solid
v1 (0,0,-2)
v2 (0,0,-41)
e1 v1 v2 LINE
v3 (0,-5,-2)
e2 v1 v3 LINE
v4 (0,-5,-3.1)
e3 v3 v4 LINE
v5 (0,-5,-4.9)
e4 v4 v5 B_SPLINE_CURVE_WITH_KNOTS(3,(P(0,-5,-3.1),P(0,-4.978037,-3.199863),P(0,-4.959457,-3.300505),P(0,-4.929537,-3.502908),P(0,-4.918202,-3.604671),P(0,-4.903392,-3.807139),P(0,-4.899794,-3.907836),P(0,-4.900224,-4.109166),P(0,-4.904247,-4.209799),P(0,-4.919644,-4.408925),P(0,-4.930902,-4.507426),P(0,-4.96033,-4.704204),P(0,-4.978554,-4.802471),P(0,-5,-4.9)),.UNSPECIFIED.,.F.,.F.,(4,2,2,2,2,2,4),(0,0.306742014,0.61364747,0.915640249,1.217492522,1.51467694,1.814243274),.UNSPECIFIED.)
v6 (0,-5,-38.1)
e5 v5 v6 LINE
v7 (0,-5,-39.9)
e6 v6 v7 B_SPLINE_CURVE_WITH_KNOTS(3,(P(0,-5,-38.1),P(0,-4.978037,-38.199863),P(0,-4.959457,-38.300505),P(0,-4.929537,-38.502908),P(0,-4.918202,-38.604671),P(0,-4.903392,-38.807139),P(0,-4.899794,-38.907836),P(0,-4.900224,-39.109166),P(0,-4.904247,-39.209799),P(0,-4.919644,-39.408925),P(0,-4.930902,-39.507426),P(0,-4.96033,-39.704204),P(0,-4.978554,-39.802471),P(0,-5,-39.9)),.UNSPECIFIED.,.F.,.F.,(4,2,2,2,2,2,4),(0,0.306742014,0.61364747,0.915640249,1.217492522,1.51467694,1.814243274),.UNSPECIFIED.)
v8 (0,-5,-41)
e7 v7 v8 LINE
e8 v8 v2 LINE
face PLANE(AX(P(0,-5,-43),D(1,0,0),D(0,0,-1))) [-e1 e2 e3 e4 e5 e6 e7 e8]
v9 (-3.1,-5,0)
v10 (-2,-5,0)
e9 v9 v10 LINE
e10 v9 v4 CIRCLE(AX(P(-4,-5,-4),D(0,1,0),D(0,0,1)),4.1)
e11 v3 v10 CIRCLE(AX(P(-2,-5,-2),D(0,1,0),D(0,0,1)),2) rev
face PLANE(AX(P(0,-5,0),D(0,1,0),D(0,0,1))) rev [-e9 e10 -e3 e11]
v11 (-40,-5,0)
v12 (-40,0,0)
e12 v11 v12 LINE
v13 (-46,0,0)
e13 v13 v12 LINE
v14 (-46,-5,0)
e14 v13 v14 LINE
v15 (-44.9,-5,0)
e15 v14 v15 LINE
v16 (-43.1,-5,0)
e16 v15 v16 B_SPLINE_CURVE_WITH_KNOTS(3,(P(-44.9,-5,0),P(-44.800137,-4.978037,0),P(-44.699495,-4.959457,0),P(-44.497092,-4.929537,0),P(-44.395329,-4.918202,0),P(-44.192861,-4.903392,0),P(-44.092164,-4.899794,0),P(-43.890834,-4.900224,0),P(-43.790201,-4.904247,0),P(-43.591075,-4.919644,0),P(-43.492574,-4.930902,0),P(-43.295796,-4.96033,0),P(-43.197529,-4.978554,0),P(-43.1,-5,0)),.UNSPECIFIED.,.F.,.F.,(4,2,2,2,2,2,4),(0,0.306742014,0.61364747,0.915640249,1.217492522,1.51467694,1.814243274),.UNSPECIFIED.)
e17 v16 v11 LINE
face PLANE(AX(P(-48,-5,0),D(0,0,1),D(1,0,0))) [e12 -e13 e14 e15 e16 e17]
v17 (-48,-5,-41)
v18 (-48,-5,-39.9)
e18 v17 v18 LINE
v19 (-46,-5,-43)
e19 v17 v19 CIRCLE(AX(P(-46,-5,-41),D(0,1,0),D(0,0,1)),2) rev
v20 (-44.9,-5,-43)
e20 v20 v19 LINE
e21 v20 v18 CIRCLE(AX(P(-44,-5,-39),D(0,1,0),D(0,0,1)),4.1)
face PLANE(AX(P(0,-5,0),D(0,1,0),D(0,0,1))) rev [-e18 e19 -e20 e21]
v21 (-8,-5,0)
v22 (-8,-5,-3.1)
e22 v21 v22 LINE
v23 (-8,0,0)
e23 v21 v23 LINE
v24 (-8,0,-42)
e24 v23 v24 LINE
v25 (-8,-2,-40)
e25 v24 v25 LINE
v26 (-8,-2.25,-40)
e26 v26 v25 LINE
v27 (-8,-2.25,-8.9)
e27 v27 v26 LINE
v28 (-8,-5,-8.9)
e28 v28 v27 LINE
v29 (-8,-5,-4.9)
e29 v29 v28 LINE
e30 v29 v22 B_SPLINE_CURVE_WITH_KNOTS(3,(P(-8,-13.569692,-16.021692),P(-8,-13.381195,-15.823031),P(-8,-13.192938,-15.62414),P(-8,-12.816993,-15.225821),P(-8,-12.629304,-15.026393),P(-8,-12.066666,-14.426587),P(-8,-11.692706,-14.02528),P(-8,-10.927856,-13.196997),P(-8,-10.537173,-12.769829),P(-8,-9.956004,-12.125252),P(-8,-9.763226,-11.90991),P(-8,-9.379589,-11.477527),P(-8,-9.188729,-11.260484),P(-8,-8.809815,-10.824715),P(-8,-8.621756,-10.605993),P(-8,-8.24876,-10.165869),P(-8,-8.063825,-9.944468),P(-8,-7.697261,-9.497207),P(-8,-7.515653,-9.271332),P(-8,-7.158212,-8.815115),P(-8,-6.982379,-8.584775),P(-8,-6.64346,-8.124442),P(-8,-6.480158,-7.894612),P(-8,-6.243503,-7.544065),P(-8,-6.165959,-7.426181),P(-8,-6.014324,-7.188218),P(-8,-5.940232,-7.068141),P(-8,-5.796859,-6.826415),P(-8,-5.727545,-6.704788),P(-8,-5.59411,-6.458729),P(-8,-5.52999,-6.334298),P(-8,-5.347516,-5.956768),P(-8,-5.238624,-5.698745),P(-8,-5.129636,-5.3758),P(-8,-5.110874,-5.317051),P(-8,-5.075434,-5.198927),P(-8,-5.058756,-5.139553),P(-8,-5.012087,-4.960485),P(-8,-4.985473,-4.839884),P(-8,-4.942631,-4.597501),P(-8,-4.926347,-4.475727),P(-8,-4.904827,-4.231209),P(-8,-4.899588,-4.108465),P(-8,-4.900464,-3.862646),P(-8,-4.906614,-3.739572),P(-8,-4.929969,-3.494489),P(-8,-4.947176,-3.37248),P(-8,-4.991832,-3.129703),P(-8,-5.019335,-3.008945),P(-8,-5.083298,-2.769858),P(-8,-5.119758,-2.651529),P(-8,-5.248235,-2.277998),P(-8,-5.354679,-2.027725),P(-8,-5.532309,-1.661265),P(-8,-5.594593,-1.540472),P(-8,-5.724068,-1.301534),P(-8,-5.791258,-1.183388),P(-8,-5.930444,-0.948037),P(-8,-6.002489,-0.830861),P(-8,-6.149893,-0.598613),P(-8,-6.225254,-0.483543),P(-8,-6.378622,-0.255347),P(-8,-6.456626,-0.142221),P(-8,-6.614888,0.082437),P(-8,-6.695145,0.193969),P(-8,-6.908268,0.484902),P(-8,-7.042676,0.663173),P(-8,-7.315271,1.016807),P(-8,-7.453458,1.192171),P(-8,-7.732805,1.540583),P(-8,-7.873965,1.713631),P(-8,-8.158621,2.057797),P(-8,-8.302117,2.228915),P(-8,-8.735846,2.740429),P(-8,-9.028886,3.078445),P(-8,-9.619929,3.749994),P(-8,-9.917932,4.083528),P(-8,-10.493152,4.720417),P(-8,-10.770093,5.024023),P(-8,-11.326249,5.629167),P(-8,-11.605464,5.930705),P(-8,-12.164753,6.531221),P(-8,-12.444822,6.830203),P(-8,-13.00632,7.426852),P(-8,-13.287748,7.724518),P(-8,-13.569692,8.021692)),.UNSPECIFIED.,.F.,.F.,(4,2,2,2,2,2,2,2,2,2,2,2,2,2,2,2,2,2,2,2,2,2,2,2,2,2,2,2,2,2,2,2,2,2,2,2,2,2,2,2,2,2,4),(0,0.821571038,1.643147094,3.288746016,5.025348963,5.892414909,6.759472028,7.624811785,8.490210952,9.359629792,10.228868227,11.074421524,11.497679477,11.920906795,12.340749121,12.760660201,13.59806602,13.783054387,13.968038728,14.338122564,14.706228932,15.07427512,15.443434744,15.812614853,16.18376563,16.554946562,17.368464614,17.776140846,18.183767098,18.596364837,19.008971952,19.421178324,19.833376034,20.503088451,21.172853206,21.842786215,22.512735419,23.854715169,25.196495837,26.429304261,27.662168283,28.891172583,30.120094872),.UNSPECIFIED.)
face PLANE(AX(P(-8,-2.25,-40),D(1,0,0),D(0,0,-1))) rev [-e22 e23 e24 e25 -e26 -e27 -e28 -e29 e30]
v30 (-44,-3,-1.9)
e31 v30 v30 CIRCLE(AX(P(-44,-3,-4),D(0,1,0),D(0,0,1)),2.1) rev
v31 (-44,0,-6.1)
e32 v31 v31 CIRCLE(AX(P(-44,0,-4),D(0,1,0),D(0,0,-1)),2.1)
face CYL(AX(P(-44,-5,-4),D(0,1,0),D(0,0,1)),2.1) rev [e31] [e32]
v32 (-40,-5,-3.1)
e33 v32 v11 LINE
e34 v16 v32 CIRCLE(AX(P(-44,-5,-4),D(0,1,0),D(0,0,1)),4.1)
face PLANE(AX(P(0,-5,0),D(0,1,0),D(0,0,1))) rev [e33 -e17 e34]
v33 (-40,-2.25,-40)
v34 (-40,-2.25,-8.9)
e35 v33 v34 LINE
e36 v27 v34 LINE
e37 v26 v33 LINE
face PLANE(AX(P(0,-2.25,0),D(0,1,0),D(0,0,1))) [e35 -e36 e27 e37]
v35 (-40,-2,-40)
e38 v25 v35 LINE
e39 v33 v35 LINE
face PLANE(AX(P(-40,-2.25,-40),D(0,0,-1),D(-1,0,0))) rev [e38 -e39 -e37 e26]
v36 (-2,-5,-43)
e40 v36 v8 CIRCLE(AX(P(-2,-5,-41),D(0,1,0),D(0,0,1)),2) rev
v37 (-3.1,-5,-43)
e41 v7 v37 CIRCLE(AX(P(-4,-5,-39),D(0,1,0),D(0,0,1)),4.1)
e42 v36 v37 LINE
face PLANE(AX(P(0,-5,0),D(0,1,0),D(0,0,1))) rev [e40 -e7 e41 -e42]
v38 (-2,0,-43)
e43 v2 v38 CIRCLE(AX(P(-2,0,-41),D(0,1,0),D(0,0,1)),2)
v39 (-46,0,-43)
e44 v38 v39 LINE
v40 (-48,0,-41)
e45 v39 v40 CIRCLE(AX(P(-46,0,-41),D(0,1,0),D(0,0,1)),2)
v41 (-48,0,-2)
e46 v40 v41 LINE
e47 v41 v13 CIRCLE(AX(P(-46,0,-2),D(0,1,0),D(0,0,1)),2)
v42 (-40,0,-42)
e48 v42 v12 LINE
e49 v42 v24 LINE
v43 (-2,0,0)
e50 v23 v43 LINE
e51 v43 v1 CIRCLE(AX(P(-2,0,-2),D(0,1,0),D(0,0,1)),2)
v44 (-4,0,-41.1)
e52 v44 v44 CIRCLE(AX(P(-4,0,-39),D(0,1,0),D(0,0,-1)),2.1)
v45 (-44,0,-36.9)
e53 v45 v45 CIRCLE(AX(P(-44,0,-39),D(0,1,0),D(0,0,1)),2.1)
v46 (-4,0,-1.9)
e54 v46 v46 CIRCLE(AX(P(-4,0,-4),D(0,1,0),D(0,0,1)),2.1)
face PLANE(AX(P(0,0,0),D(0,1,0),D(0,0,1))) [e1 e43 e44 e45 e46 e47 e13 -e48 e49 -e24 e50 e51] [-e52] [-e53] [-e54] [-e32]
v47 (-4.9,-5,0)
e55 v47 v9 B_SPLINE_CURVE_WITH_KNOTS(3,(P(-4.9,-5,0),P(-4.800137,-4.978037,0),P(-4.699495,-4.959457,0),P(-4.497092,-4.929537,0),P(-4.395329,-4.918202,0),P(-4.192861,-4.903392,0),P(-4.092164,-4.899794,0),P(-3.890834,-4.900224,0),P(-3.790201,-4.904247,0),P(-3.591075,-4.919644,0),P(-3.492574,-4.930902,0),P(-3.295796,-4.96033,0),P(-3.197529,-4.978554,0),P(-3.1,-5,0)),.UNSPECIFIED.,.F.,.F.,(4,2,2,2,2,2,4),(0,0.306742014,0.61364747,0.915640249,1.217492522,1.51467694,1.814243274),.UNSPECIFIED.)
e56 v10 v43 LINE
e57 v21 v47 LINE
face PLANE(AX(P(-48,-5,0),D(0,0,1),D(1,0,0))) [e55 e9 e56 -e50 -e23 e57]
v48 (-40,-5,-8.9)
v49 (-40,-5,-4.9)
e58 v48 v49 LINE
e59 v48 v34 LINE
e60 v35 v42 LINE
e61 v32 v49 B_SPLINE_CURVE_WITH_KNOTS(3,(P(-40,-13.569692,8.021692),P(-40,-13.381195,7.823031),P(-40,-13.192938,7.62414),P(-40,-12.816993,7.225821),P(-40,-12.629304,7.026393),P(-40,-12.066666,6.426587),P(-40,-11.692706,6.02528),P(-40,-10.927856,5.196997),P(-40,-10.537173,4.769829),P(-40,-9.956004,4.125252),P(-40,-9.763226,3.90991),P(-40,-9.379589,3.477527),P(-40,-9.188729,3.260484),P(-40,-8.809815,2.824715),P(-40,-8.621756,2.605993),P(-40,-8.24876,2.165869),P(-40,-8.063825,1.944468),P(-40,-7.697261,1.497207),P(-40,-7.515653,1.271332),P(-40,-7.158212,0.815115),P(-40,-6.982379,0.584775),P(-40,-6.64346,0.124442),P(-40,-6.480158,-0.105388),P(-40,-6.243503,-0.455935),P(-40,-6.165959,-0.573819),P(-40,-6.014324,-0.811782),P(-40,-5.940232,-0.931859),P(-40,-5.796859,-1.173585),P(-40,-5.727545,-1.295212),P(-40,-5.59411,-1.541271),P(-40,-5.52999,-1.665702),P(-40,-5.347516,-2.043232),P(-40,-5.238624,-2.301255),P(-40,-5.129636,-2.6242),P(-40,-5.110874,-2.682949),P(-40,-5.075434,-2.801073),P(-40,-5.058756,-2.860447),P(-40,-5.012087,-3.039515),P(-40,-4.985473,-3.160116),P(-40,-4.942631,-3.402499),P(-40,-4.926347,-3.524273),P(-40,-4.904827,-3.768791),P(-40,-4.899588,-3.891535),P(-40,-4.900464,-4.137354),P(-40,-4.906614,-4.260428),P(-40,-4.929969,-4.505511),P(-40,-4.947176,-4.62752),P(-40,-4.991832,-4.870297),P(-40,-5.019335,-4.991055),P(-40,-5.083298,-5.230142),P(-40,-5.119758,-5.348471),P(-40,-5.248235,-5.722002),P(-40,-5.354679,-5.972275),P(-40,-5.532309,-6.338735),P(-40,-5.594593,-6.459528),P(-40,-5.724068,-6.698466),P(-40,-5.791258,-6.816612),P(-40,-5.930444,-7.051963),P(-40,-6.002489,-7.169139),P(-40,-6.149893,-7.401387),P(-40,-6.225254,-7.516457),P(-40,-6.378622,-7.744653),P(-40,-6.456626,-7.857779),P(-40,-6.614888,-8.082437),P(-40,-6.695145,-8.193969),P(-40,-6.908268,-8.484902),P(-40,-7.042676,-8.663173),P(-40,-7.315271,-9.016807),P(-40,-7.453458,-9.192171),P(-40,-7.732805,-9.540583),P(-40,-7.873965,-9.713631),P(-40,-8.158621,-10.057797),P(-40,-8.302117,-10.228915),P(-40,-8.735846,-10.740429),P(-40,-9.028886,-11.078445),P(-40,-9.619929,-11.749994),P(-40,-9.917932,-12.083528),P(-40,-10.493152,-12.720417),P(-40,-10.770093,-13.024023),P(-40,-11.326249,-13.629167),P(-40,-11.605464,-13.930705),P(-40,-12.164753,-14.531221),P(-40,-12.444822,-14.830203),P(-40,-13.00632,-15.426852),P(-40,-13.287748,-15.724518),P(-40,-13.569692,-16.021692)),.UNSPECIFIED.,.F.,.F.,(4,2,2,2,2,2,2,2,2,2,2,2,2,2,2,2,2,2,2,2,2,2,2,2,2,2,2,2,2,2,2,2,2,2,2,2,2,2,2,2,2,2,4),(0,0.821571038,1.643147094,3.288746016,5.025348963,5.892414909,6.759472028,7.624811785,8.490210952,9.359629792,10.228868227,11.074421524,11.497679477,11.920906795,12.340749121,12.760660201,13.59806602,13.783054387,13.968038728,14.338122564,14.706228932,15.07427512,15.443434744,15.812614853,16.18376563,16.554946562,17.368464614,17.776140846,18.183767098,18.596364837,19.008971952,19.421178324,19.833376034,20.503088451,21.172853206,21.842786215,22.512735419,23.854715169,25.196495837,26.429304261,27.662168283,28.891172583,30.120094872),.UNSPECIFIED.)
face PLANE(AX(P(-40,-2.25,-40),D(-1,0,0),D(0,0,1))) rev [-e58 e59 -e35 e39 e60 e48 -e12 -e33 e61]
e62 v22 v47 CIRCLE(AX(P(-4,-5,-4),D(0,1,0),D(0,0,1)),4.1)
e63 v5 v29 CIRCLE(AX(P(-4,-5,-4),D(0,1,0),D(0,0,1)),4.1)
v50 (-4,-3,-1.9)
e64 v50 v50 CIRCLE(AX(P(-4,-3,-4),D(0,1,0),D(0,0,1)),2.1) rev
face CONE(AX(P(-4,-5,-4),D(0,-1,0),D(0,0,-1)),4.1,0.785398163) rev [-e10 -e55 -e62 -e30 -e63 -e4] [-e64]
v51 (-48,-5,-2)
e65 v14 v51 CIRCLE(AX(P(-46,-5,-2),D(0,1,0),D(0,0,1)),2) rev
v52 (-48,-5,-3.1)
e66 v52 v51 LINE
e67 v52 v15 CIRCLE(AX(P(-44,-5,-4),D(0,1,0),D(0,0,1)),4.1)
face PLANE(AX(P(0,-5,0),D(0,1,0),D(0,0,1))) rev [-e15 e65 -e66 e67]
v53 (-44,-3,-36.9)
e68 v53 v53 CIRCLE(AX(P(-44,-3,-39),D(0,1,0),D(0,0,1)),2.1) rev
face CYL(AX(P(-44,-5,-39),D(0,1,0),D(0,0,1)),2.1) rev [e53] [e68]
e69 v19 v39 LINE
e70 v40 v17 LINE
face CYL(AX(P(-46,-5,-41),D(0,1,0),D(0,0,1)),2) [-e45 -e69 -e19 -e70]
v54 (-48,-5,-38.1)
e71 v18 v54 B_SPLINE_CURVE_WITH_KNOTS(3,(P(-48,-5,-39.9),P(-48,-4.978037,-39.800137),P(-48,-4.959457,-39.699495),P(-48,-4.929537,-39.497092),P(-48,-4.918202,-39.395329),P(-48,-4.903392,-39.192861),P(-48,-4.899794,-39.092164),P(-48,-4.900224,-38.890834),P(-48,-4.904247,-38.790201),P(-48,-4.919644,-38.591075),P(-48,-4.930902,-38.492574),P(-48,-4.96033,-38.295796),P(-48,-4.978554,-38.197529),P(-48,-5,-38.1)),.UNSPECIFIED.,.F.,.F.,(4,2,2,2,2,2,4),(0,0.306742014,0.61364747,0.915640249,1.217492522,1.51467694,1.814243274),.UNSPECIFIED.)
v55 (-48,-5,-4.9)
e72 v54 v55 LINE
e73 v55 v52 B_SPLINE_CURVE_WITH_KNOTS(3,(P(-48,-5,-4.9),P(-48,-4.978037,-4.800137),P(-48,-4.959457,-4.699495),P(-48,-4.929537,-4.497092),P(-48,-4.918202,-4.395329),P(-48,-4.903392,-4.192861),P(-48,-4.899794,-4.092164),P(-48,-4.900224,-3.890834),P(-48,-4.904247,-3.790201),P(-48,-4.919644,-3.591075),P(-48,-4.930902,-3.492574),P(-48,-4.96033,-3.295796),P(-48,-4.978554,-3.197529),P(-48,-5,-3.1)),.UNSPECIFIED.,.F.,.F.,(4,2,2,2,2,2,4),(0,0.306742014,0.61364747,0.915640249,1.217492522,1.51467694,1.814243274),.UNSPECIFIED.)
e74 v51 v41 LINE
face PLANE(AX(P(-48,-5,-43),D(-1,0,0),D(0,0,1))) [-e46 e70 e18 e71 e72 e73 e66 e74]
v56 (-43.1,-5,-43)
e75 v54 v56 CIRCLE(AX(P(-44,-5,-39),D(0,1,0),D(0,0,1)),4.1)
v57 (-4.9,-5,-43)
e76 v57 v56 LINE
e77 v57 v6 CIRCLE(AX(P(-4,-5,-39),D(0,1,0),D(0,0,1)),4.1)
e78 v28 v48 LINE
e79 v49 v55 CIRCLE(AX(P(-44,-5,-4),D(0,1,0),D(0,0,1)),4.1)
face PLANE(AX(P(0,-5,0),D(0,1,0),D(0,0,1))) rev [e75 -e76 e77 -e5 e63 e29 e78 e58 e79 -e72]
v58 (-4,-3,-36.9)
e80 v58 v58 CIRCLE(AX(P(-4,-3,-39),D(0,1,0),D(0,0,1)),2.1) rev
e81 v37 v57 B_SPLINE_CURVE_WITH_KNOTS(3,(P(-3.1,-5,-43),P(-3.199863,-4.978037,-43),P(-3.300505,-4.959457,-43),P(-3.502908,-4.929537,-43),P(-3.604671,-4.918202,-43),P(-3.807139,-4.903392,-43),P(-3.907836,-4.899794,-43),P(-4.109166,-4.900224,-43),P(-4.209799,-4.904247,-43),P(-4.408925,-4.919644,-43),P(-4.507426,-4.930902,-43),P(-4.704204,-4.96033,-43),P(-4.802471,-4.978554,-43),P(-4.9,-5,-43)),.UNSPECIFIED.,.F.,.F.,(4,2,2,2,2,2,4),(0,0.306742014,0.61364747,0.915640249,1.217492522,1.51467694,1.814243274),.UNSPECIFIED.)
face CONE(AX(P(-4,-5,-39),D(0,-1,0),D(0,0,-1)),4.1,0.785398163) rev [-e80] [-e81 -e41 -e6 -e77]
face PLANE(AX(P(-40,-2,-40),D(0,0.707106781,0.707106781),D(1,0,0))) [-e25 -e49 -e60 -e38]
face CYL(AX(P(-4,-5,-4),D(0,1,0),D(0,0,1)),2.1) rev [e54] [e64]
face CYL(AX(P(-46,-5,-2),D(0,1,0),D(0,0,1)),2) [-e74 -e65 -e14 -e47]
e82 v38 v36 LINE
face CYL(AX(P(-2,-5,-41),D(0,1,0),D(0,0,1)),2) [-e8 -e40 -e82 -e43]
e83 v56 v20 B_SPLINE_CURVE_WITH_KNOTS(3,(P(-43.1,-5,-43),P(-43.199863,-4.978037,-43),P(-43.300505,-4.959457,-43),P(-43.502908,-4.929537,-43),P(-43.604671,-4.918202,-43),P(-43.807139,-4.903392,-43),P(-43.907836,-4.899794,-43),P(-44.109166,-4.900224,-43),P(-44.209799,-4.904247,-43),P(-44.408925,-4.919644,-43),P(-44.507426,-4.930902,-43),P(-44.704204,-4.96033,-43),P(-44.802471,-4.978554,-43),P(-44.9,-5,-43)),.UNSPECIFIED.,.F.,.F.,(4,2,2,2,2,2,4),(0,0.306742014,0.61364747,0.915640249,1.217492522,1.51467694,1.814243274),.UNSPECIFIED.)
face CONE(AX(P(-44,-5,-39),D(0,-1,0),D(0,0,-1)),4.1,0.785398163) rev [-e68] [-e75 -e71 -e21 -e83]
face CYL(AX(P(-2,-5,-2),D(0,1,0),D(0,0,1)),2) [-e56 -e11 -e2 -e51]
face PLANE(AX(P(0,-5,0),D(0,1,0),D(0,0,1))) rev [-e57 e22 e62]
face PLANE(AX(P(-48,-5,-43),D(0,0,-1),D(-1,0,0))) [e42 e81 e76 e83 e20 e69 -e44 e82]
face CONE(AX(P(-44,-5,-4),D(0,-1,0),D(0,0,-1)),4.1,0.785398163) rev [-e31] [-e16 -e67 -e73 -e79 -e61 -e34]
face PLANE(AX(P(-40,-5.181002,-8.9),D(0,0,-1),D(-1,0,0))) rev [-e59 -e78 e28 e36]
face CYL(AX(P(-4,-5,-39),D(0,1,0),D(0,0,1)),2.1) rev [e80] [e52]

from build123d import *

# Parameters (mm, degrees)
SKETCH_1_W          = 48
SKETCH_1_H          = 43
EXTRUDE_1_DEPTH     = 5
SKETCH_2_W          = 32
SKETCH_2_H          = 40
CUT_EXTRUDE_1_DEPTH = 2.25
SKETCH_3_R          = 2.1
CUT_EXTRUDE_2_DEPTH = 65.637450445
CHAMFER_1_SIZE      = 2
FILLET_1_R          = 2
CHAMFER_2_SIZE      = 2
SKETCH_4_W          = 32
SKETCH_4_H          = 8.9
CUT_EXTRUDE_3_DEPTH = 65.502422435


with BuildPart() as part:
    # Эскиз1 → Бобышка-Вытянуть1 (new body)
    with BuildSketch(Plane(origin=(0, 0, 0), x_dir=(1, 0, 0), z_dir=(0, 1, 0))):
        with Locations((-24, 21.5)):
            Rectangle(SKETCH_1_W, SKETCH_1_H)
    extrude(amount=-EXTRUDE_1_DEPTH)

    # Эскиз2 → Вырез-Вытянуть1 (cut)
    with BuildSketch(Plane(origin=(0, 0, 0), x_dir=(1, 0, 0), z_dir=(0, 1, 0))):
        with Locations((-24, 20)):
            Rectangle(SKETCH_2_W, SKETCH_2_H)
    extrude(amount=-CUT_EXTRUDE_1_DEPTH, mode=Mode.SUBTRACT)

    # Эскиз3 → Вырез-Вытянуть2 (cut, through all)
    with BuildSketch(Plane(origin=(0, 0, 0), x_dir=(1, 0, 0), z_dir=(0, 1, 0))):
        with Locations(Location((-44, 39, 0), (0, 0, 270))):
            Circle(SKETCH_3_R)
        with Locations(Location((-4, 39, 0), (0, 0, 90))):
            Circle(SKETCH_3_R)
        with Locations(Location((-4, 4, 0), (0, 0, 270))):
            Circle(SKETCH_3_R)
        with Locations(Location((-44, 4, 0), (0, 0, 90))):
            Circle(SKETCH_3_R)
    extrude(amount=-CUT_EXTRUDE_2_DEPTH, mode=Mode.SUBTRACT)

    # Фаска1
    # the kernel refuses this chamfer: 2 mm, written as the material it takes off along each edge
    with BuildSketch(Plane(origin=(-44, -5, -4), x_dir=(0, 0, -1), z_dir=(1, 0, 0))) as chamfer_1_piece_1:
        Polygon((2.1 + CHAMFER_1_SIZE, 0), (2.1, CHAMFER_1_SIZE), (2.1, 0), align=None)
    revolve(axis=Axis((-44, -5, -4), (0, 1, 0)), mode=Mode.SUBTRACT)
    with BuildSketch(Plane(origin=(-4, -5, -4), x_dir=(0, 0, 1), z_dir=(-1, 0, 0))) as chamfer_1_piece_2:
        Polygon((2.1 + CHAMFER_1_SIZE, 0), (2.1, CHAMFER_1_SIZE), (2.1, 0), align=None)
    revolve(axis=Axis((-4, -5, -4), (0, 1, 0)), mode=Mode.SUBTRACT)
    with BuildSketch(Plane(origin=(-4, -5, -39), x_dir=(0, 0, -1), z_dir=(1, 0, 0))) as chamfer_1_piece_3:
        Polygon((2.1 + CHAMFER_1_SIZE, 0), (2.1, CHAMFER_1_SIZE), (2.1, 0), align=None)
    revolve(axis=Axis((-4, -5, -39), (0, 1, 0)), mode=Mode.SUBTRACT)
    with BuildSketch(Plane(origin=(-44, -5, -39), x_dir=(0, 0, 1), z_dir=(-1, 0, 0))) as chamfer_1_piece_4:
        Polygon((2.1 + CHAMFER_1_SIZE, 0), (2.1, CHAMFER_1_SIZE), (2.1, 0), align=None)
    revolve(axis=Axis((-44, -5, -39), (0, 1, 0)), mode=Mode.SUBTRACT)

    # Скругление1
    fillet_1_edges = [part.edges().sort_by_distance(p)[0] for p in [
        (-48, -2.5, -43),
        (0, -2.5, -43),
        (0, -2.5, 0),
        (-48, -2.5, 0),
    ]]
    fillet(fillet_1_edges, radius=FILLET_1_R)

    # Фаска2
    chamfer_2_edges = [part.edges().sort_by_distance(p)[0] for p in [
        (-24, 0, -40),
    ]]
    chamfer(chamfer_2_edges, length=CHAMFER_2_SIZE)

    # Эскиз4 → Вырез-Вытянуть3 (cut, through all)
    with BuildSketch(Plane(origin=(0, -2.25, 0), x_dir=(1, 0, 0), z_dir=(0, 1, 0))):
        with Locations((-24, 4.45)):
            Rectangle(SKETCH_4_W, SKETCH_4_H)
    extrude(amount=-CUT_EXTRUDE_3_DEPTH, mode=Mode.SUBTRACT)


solid = part.part
